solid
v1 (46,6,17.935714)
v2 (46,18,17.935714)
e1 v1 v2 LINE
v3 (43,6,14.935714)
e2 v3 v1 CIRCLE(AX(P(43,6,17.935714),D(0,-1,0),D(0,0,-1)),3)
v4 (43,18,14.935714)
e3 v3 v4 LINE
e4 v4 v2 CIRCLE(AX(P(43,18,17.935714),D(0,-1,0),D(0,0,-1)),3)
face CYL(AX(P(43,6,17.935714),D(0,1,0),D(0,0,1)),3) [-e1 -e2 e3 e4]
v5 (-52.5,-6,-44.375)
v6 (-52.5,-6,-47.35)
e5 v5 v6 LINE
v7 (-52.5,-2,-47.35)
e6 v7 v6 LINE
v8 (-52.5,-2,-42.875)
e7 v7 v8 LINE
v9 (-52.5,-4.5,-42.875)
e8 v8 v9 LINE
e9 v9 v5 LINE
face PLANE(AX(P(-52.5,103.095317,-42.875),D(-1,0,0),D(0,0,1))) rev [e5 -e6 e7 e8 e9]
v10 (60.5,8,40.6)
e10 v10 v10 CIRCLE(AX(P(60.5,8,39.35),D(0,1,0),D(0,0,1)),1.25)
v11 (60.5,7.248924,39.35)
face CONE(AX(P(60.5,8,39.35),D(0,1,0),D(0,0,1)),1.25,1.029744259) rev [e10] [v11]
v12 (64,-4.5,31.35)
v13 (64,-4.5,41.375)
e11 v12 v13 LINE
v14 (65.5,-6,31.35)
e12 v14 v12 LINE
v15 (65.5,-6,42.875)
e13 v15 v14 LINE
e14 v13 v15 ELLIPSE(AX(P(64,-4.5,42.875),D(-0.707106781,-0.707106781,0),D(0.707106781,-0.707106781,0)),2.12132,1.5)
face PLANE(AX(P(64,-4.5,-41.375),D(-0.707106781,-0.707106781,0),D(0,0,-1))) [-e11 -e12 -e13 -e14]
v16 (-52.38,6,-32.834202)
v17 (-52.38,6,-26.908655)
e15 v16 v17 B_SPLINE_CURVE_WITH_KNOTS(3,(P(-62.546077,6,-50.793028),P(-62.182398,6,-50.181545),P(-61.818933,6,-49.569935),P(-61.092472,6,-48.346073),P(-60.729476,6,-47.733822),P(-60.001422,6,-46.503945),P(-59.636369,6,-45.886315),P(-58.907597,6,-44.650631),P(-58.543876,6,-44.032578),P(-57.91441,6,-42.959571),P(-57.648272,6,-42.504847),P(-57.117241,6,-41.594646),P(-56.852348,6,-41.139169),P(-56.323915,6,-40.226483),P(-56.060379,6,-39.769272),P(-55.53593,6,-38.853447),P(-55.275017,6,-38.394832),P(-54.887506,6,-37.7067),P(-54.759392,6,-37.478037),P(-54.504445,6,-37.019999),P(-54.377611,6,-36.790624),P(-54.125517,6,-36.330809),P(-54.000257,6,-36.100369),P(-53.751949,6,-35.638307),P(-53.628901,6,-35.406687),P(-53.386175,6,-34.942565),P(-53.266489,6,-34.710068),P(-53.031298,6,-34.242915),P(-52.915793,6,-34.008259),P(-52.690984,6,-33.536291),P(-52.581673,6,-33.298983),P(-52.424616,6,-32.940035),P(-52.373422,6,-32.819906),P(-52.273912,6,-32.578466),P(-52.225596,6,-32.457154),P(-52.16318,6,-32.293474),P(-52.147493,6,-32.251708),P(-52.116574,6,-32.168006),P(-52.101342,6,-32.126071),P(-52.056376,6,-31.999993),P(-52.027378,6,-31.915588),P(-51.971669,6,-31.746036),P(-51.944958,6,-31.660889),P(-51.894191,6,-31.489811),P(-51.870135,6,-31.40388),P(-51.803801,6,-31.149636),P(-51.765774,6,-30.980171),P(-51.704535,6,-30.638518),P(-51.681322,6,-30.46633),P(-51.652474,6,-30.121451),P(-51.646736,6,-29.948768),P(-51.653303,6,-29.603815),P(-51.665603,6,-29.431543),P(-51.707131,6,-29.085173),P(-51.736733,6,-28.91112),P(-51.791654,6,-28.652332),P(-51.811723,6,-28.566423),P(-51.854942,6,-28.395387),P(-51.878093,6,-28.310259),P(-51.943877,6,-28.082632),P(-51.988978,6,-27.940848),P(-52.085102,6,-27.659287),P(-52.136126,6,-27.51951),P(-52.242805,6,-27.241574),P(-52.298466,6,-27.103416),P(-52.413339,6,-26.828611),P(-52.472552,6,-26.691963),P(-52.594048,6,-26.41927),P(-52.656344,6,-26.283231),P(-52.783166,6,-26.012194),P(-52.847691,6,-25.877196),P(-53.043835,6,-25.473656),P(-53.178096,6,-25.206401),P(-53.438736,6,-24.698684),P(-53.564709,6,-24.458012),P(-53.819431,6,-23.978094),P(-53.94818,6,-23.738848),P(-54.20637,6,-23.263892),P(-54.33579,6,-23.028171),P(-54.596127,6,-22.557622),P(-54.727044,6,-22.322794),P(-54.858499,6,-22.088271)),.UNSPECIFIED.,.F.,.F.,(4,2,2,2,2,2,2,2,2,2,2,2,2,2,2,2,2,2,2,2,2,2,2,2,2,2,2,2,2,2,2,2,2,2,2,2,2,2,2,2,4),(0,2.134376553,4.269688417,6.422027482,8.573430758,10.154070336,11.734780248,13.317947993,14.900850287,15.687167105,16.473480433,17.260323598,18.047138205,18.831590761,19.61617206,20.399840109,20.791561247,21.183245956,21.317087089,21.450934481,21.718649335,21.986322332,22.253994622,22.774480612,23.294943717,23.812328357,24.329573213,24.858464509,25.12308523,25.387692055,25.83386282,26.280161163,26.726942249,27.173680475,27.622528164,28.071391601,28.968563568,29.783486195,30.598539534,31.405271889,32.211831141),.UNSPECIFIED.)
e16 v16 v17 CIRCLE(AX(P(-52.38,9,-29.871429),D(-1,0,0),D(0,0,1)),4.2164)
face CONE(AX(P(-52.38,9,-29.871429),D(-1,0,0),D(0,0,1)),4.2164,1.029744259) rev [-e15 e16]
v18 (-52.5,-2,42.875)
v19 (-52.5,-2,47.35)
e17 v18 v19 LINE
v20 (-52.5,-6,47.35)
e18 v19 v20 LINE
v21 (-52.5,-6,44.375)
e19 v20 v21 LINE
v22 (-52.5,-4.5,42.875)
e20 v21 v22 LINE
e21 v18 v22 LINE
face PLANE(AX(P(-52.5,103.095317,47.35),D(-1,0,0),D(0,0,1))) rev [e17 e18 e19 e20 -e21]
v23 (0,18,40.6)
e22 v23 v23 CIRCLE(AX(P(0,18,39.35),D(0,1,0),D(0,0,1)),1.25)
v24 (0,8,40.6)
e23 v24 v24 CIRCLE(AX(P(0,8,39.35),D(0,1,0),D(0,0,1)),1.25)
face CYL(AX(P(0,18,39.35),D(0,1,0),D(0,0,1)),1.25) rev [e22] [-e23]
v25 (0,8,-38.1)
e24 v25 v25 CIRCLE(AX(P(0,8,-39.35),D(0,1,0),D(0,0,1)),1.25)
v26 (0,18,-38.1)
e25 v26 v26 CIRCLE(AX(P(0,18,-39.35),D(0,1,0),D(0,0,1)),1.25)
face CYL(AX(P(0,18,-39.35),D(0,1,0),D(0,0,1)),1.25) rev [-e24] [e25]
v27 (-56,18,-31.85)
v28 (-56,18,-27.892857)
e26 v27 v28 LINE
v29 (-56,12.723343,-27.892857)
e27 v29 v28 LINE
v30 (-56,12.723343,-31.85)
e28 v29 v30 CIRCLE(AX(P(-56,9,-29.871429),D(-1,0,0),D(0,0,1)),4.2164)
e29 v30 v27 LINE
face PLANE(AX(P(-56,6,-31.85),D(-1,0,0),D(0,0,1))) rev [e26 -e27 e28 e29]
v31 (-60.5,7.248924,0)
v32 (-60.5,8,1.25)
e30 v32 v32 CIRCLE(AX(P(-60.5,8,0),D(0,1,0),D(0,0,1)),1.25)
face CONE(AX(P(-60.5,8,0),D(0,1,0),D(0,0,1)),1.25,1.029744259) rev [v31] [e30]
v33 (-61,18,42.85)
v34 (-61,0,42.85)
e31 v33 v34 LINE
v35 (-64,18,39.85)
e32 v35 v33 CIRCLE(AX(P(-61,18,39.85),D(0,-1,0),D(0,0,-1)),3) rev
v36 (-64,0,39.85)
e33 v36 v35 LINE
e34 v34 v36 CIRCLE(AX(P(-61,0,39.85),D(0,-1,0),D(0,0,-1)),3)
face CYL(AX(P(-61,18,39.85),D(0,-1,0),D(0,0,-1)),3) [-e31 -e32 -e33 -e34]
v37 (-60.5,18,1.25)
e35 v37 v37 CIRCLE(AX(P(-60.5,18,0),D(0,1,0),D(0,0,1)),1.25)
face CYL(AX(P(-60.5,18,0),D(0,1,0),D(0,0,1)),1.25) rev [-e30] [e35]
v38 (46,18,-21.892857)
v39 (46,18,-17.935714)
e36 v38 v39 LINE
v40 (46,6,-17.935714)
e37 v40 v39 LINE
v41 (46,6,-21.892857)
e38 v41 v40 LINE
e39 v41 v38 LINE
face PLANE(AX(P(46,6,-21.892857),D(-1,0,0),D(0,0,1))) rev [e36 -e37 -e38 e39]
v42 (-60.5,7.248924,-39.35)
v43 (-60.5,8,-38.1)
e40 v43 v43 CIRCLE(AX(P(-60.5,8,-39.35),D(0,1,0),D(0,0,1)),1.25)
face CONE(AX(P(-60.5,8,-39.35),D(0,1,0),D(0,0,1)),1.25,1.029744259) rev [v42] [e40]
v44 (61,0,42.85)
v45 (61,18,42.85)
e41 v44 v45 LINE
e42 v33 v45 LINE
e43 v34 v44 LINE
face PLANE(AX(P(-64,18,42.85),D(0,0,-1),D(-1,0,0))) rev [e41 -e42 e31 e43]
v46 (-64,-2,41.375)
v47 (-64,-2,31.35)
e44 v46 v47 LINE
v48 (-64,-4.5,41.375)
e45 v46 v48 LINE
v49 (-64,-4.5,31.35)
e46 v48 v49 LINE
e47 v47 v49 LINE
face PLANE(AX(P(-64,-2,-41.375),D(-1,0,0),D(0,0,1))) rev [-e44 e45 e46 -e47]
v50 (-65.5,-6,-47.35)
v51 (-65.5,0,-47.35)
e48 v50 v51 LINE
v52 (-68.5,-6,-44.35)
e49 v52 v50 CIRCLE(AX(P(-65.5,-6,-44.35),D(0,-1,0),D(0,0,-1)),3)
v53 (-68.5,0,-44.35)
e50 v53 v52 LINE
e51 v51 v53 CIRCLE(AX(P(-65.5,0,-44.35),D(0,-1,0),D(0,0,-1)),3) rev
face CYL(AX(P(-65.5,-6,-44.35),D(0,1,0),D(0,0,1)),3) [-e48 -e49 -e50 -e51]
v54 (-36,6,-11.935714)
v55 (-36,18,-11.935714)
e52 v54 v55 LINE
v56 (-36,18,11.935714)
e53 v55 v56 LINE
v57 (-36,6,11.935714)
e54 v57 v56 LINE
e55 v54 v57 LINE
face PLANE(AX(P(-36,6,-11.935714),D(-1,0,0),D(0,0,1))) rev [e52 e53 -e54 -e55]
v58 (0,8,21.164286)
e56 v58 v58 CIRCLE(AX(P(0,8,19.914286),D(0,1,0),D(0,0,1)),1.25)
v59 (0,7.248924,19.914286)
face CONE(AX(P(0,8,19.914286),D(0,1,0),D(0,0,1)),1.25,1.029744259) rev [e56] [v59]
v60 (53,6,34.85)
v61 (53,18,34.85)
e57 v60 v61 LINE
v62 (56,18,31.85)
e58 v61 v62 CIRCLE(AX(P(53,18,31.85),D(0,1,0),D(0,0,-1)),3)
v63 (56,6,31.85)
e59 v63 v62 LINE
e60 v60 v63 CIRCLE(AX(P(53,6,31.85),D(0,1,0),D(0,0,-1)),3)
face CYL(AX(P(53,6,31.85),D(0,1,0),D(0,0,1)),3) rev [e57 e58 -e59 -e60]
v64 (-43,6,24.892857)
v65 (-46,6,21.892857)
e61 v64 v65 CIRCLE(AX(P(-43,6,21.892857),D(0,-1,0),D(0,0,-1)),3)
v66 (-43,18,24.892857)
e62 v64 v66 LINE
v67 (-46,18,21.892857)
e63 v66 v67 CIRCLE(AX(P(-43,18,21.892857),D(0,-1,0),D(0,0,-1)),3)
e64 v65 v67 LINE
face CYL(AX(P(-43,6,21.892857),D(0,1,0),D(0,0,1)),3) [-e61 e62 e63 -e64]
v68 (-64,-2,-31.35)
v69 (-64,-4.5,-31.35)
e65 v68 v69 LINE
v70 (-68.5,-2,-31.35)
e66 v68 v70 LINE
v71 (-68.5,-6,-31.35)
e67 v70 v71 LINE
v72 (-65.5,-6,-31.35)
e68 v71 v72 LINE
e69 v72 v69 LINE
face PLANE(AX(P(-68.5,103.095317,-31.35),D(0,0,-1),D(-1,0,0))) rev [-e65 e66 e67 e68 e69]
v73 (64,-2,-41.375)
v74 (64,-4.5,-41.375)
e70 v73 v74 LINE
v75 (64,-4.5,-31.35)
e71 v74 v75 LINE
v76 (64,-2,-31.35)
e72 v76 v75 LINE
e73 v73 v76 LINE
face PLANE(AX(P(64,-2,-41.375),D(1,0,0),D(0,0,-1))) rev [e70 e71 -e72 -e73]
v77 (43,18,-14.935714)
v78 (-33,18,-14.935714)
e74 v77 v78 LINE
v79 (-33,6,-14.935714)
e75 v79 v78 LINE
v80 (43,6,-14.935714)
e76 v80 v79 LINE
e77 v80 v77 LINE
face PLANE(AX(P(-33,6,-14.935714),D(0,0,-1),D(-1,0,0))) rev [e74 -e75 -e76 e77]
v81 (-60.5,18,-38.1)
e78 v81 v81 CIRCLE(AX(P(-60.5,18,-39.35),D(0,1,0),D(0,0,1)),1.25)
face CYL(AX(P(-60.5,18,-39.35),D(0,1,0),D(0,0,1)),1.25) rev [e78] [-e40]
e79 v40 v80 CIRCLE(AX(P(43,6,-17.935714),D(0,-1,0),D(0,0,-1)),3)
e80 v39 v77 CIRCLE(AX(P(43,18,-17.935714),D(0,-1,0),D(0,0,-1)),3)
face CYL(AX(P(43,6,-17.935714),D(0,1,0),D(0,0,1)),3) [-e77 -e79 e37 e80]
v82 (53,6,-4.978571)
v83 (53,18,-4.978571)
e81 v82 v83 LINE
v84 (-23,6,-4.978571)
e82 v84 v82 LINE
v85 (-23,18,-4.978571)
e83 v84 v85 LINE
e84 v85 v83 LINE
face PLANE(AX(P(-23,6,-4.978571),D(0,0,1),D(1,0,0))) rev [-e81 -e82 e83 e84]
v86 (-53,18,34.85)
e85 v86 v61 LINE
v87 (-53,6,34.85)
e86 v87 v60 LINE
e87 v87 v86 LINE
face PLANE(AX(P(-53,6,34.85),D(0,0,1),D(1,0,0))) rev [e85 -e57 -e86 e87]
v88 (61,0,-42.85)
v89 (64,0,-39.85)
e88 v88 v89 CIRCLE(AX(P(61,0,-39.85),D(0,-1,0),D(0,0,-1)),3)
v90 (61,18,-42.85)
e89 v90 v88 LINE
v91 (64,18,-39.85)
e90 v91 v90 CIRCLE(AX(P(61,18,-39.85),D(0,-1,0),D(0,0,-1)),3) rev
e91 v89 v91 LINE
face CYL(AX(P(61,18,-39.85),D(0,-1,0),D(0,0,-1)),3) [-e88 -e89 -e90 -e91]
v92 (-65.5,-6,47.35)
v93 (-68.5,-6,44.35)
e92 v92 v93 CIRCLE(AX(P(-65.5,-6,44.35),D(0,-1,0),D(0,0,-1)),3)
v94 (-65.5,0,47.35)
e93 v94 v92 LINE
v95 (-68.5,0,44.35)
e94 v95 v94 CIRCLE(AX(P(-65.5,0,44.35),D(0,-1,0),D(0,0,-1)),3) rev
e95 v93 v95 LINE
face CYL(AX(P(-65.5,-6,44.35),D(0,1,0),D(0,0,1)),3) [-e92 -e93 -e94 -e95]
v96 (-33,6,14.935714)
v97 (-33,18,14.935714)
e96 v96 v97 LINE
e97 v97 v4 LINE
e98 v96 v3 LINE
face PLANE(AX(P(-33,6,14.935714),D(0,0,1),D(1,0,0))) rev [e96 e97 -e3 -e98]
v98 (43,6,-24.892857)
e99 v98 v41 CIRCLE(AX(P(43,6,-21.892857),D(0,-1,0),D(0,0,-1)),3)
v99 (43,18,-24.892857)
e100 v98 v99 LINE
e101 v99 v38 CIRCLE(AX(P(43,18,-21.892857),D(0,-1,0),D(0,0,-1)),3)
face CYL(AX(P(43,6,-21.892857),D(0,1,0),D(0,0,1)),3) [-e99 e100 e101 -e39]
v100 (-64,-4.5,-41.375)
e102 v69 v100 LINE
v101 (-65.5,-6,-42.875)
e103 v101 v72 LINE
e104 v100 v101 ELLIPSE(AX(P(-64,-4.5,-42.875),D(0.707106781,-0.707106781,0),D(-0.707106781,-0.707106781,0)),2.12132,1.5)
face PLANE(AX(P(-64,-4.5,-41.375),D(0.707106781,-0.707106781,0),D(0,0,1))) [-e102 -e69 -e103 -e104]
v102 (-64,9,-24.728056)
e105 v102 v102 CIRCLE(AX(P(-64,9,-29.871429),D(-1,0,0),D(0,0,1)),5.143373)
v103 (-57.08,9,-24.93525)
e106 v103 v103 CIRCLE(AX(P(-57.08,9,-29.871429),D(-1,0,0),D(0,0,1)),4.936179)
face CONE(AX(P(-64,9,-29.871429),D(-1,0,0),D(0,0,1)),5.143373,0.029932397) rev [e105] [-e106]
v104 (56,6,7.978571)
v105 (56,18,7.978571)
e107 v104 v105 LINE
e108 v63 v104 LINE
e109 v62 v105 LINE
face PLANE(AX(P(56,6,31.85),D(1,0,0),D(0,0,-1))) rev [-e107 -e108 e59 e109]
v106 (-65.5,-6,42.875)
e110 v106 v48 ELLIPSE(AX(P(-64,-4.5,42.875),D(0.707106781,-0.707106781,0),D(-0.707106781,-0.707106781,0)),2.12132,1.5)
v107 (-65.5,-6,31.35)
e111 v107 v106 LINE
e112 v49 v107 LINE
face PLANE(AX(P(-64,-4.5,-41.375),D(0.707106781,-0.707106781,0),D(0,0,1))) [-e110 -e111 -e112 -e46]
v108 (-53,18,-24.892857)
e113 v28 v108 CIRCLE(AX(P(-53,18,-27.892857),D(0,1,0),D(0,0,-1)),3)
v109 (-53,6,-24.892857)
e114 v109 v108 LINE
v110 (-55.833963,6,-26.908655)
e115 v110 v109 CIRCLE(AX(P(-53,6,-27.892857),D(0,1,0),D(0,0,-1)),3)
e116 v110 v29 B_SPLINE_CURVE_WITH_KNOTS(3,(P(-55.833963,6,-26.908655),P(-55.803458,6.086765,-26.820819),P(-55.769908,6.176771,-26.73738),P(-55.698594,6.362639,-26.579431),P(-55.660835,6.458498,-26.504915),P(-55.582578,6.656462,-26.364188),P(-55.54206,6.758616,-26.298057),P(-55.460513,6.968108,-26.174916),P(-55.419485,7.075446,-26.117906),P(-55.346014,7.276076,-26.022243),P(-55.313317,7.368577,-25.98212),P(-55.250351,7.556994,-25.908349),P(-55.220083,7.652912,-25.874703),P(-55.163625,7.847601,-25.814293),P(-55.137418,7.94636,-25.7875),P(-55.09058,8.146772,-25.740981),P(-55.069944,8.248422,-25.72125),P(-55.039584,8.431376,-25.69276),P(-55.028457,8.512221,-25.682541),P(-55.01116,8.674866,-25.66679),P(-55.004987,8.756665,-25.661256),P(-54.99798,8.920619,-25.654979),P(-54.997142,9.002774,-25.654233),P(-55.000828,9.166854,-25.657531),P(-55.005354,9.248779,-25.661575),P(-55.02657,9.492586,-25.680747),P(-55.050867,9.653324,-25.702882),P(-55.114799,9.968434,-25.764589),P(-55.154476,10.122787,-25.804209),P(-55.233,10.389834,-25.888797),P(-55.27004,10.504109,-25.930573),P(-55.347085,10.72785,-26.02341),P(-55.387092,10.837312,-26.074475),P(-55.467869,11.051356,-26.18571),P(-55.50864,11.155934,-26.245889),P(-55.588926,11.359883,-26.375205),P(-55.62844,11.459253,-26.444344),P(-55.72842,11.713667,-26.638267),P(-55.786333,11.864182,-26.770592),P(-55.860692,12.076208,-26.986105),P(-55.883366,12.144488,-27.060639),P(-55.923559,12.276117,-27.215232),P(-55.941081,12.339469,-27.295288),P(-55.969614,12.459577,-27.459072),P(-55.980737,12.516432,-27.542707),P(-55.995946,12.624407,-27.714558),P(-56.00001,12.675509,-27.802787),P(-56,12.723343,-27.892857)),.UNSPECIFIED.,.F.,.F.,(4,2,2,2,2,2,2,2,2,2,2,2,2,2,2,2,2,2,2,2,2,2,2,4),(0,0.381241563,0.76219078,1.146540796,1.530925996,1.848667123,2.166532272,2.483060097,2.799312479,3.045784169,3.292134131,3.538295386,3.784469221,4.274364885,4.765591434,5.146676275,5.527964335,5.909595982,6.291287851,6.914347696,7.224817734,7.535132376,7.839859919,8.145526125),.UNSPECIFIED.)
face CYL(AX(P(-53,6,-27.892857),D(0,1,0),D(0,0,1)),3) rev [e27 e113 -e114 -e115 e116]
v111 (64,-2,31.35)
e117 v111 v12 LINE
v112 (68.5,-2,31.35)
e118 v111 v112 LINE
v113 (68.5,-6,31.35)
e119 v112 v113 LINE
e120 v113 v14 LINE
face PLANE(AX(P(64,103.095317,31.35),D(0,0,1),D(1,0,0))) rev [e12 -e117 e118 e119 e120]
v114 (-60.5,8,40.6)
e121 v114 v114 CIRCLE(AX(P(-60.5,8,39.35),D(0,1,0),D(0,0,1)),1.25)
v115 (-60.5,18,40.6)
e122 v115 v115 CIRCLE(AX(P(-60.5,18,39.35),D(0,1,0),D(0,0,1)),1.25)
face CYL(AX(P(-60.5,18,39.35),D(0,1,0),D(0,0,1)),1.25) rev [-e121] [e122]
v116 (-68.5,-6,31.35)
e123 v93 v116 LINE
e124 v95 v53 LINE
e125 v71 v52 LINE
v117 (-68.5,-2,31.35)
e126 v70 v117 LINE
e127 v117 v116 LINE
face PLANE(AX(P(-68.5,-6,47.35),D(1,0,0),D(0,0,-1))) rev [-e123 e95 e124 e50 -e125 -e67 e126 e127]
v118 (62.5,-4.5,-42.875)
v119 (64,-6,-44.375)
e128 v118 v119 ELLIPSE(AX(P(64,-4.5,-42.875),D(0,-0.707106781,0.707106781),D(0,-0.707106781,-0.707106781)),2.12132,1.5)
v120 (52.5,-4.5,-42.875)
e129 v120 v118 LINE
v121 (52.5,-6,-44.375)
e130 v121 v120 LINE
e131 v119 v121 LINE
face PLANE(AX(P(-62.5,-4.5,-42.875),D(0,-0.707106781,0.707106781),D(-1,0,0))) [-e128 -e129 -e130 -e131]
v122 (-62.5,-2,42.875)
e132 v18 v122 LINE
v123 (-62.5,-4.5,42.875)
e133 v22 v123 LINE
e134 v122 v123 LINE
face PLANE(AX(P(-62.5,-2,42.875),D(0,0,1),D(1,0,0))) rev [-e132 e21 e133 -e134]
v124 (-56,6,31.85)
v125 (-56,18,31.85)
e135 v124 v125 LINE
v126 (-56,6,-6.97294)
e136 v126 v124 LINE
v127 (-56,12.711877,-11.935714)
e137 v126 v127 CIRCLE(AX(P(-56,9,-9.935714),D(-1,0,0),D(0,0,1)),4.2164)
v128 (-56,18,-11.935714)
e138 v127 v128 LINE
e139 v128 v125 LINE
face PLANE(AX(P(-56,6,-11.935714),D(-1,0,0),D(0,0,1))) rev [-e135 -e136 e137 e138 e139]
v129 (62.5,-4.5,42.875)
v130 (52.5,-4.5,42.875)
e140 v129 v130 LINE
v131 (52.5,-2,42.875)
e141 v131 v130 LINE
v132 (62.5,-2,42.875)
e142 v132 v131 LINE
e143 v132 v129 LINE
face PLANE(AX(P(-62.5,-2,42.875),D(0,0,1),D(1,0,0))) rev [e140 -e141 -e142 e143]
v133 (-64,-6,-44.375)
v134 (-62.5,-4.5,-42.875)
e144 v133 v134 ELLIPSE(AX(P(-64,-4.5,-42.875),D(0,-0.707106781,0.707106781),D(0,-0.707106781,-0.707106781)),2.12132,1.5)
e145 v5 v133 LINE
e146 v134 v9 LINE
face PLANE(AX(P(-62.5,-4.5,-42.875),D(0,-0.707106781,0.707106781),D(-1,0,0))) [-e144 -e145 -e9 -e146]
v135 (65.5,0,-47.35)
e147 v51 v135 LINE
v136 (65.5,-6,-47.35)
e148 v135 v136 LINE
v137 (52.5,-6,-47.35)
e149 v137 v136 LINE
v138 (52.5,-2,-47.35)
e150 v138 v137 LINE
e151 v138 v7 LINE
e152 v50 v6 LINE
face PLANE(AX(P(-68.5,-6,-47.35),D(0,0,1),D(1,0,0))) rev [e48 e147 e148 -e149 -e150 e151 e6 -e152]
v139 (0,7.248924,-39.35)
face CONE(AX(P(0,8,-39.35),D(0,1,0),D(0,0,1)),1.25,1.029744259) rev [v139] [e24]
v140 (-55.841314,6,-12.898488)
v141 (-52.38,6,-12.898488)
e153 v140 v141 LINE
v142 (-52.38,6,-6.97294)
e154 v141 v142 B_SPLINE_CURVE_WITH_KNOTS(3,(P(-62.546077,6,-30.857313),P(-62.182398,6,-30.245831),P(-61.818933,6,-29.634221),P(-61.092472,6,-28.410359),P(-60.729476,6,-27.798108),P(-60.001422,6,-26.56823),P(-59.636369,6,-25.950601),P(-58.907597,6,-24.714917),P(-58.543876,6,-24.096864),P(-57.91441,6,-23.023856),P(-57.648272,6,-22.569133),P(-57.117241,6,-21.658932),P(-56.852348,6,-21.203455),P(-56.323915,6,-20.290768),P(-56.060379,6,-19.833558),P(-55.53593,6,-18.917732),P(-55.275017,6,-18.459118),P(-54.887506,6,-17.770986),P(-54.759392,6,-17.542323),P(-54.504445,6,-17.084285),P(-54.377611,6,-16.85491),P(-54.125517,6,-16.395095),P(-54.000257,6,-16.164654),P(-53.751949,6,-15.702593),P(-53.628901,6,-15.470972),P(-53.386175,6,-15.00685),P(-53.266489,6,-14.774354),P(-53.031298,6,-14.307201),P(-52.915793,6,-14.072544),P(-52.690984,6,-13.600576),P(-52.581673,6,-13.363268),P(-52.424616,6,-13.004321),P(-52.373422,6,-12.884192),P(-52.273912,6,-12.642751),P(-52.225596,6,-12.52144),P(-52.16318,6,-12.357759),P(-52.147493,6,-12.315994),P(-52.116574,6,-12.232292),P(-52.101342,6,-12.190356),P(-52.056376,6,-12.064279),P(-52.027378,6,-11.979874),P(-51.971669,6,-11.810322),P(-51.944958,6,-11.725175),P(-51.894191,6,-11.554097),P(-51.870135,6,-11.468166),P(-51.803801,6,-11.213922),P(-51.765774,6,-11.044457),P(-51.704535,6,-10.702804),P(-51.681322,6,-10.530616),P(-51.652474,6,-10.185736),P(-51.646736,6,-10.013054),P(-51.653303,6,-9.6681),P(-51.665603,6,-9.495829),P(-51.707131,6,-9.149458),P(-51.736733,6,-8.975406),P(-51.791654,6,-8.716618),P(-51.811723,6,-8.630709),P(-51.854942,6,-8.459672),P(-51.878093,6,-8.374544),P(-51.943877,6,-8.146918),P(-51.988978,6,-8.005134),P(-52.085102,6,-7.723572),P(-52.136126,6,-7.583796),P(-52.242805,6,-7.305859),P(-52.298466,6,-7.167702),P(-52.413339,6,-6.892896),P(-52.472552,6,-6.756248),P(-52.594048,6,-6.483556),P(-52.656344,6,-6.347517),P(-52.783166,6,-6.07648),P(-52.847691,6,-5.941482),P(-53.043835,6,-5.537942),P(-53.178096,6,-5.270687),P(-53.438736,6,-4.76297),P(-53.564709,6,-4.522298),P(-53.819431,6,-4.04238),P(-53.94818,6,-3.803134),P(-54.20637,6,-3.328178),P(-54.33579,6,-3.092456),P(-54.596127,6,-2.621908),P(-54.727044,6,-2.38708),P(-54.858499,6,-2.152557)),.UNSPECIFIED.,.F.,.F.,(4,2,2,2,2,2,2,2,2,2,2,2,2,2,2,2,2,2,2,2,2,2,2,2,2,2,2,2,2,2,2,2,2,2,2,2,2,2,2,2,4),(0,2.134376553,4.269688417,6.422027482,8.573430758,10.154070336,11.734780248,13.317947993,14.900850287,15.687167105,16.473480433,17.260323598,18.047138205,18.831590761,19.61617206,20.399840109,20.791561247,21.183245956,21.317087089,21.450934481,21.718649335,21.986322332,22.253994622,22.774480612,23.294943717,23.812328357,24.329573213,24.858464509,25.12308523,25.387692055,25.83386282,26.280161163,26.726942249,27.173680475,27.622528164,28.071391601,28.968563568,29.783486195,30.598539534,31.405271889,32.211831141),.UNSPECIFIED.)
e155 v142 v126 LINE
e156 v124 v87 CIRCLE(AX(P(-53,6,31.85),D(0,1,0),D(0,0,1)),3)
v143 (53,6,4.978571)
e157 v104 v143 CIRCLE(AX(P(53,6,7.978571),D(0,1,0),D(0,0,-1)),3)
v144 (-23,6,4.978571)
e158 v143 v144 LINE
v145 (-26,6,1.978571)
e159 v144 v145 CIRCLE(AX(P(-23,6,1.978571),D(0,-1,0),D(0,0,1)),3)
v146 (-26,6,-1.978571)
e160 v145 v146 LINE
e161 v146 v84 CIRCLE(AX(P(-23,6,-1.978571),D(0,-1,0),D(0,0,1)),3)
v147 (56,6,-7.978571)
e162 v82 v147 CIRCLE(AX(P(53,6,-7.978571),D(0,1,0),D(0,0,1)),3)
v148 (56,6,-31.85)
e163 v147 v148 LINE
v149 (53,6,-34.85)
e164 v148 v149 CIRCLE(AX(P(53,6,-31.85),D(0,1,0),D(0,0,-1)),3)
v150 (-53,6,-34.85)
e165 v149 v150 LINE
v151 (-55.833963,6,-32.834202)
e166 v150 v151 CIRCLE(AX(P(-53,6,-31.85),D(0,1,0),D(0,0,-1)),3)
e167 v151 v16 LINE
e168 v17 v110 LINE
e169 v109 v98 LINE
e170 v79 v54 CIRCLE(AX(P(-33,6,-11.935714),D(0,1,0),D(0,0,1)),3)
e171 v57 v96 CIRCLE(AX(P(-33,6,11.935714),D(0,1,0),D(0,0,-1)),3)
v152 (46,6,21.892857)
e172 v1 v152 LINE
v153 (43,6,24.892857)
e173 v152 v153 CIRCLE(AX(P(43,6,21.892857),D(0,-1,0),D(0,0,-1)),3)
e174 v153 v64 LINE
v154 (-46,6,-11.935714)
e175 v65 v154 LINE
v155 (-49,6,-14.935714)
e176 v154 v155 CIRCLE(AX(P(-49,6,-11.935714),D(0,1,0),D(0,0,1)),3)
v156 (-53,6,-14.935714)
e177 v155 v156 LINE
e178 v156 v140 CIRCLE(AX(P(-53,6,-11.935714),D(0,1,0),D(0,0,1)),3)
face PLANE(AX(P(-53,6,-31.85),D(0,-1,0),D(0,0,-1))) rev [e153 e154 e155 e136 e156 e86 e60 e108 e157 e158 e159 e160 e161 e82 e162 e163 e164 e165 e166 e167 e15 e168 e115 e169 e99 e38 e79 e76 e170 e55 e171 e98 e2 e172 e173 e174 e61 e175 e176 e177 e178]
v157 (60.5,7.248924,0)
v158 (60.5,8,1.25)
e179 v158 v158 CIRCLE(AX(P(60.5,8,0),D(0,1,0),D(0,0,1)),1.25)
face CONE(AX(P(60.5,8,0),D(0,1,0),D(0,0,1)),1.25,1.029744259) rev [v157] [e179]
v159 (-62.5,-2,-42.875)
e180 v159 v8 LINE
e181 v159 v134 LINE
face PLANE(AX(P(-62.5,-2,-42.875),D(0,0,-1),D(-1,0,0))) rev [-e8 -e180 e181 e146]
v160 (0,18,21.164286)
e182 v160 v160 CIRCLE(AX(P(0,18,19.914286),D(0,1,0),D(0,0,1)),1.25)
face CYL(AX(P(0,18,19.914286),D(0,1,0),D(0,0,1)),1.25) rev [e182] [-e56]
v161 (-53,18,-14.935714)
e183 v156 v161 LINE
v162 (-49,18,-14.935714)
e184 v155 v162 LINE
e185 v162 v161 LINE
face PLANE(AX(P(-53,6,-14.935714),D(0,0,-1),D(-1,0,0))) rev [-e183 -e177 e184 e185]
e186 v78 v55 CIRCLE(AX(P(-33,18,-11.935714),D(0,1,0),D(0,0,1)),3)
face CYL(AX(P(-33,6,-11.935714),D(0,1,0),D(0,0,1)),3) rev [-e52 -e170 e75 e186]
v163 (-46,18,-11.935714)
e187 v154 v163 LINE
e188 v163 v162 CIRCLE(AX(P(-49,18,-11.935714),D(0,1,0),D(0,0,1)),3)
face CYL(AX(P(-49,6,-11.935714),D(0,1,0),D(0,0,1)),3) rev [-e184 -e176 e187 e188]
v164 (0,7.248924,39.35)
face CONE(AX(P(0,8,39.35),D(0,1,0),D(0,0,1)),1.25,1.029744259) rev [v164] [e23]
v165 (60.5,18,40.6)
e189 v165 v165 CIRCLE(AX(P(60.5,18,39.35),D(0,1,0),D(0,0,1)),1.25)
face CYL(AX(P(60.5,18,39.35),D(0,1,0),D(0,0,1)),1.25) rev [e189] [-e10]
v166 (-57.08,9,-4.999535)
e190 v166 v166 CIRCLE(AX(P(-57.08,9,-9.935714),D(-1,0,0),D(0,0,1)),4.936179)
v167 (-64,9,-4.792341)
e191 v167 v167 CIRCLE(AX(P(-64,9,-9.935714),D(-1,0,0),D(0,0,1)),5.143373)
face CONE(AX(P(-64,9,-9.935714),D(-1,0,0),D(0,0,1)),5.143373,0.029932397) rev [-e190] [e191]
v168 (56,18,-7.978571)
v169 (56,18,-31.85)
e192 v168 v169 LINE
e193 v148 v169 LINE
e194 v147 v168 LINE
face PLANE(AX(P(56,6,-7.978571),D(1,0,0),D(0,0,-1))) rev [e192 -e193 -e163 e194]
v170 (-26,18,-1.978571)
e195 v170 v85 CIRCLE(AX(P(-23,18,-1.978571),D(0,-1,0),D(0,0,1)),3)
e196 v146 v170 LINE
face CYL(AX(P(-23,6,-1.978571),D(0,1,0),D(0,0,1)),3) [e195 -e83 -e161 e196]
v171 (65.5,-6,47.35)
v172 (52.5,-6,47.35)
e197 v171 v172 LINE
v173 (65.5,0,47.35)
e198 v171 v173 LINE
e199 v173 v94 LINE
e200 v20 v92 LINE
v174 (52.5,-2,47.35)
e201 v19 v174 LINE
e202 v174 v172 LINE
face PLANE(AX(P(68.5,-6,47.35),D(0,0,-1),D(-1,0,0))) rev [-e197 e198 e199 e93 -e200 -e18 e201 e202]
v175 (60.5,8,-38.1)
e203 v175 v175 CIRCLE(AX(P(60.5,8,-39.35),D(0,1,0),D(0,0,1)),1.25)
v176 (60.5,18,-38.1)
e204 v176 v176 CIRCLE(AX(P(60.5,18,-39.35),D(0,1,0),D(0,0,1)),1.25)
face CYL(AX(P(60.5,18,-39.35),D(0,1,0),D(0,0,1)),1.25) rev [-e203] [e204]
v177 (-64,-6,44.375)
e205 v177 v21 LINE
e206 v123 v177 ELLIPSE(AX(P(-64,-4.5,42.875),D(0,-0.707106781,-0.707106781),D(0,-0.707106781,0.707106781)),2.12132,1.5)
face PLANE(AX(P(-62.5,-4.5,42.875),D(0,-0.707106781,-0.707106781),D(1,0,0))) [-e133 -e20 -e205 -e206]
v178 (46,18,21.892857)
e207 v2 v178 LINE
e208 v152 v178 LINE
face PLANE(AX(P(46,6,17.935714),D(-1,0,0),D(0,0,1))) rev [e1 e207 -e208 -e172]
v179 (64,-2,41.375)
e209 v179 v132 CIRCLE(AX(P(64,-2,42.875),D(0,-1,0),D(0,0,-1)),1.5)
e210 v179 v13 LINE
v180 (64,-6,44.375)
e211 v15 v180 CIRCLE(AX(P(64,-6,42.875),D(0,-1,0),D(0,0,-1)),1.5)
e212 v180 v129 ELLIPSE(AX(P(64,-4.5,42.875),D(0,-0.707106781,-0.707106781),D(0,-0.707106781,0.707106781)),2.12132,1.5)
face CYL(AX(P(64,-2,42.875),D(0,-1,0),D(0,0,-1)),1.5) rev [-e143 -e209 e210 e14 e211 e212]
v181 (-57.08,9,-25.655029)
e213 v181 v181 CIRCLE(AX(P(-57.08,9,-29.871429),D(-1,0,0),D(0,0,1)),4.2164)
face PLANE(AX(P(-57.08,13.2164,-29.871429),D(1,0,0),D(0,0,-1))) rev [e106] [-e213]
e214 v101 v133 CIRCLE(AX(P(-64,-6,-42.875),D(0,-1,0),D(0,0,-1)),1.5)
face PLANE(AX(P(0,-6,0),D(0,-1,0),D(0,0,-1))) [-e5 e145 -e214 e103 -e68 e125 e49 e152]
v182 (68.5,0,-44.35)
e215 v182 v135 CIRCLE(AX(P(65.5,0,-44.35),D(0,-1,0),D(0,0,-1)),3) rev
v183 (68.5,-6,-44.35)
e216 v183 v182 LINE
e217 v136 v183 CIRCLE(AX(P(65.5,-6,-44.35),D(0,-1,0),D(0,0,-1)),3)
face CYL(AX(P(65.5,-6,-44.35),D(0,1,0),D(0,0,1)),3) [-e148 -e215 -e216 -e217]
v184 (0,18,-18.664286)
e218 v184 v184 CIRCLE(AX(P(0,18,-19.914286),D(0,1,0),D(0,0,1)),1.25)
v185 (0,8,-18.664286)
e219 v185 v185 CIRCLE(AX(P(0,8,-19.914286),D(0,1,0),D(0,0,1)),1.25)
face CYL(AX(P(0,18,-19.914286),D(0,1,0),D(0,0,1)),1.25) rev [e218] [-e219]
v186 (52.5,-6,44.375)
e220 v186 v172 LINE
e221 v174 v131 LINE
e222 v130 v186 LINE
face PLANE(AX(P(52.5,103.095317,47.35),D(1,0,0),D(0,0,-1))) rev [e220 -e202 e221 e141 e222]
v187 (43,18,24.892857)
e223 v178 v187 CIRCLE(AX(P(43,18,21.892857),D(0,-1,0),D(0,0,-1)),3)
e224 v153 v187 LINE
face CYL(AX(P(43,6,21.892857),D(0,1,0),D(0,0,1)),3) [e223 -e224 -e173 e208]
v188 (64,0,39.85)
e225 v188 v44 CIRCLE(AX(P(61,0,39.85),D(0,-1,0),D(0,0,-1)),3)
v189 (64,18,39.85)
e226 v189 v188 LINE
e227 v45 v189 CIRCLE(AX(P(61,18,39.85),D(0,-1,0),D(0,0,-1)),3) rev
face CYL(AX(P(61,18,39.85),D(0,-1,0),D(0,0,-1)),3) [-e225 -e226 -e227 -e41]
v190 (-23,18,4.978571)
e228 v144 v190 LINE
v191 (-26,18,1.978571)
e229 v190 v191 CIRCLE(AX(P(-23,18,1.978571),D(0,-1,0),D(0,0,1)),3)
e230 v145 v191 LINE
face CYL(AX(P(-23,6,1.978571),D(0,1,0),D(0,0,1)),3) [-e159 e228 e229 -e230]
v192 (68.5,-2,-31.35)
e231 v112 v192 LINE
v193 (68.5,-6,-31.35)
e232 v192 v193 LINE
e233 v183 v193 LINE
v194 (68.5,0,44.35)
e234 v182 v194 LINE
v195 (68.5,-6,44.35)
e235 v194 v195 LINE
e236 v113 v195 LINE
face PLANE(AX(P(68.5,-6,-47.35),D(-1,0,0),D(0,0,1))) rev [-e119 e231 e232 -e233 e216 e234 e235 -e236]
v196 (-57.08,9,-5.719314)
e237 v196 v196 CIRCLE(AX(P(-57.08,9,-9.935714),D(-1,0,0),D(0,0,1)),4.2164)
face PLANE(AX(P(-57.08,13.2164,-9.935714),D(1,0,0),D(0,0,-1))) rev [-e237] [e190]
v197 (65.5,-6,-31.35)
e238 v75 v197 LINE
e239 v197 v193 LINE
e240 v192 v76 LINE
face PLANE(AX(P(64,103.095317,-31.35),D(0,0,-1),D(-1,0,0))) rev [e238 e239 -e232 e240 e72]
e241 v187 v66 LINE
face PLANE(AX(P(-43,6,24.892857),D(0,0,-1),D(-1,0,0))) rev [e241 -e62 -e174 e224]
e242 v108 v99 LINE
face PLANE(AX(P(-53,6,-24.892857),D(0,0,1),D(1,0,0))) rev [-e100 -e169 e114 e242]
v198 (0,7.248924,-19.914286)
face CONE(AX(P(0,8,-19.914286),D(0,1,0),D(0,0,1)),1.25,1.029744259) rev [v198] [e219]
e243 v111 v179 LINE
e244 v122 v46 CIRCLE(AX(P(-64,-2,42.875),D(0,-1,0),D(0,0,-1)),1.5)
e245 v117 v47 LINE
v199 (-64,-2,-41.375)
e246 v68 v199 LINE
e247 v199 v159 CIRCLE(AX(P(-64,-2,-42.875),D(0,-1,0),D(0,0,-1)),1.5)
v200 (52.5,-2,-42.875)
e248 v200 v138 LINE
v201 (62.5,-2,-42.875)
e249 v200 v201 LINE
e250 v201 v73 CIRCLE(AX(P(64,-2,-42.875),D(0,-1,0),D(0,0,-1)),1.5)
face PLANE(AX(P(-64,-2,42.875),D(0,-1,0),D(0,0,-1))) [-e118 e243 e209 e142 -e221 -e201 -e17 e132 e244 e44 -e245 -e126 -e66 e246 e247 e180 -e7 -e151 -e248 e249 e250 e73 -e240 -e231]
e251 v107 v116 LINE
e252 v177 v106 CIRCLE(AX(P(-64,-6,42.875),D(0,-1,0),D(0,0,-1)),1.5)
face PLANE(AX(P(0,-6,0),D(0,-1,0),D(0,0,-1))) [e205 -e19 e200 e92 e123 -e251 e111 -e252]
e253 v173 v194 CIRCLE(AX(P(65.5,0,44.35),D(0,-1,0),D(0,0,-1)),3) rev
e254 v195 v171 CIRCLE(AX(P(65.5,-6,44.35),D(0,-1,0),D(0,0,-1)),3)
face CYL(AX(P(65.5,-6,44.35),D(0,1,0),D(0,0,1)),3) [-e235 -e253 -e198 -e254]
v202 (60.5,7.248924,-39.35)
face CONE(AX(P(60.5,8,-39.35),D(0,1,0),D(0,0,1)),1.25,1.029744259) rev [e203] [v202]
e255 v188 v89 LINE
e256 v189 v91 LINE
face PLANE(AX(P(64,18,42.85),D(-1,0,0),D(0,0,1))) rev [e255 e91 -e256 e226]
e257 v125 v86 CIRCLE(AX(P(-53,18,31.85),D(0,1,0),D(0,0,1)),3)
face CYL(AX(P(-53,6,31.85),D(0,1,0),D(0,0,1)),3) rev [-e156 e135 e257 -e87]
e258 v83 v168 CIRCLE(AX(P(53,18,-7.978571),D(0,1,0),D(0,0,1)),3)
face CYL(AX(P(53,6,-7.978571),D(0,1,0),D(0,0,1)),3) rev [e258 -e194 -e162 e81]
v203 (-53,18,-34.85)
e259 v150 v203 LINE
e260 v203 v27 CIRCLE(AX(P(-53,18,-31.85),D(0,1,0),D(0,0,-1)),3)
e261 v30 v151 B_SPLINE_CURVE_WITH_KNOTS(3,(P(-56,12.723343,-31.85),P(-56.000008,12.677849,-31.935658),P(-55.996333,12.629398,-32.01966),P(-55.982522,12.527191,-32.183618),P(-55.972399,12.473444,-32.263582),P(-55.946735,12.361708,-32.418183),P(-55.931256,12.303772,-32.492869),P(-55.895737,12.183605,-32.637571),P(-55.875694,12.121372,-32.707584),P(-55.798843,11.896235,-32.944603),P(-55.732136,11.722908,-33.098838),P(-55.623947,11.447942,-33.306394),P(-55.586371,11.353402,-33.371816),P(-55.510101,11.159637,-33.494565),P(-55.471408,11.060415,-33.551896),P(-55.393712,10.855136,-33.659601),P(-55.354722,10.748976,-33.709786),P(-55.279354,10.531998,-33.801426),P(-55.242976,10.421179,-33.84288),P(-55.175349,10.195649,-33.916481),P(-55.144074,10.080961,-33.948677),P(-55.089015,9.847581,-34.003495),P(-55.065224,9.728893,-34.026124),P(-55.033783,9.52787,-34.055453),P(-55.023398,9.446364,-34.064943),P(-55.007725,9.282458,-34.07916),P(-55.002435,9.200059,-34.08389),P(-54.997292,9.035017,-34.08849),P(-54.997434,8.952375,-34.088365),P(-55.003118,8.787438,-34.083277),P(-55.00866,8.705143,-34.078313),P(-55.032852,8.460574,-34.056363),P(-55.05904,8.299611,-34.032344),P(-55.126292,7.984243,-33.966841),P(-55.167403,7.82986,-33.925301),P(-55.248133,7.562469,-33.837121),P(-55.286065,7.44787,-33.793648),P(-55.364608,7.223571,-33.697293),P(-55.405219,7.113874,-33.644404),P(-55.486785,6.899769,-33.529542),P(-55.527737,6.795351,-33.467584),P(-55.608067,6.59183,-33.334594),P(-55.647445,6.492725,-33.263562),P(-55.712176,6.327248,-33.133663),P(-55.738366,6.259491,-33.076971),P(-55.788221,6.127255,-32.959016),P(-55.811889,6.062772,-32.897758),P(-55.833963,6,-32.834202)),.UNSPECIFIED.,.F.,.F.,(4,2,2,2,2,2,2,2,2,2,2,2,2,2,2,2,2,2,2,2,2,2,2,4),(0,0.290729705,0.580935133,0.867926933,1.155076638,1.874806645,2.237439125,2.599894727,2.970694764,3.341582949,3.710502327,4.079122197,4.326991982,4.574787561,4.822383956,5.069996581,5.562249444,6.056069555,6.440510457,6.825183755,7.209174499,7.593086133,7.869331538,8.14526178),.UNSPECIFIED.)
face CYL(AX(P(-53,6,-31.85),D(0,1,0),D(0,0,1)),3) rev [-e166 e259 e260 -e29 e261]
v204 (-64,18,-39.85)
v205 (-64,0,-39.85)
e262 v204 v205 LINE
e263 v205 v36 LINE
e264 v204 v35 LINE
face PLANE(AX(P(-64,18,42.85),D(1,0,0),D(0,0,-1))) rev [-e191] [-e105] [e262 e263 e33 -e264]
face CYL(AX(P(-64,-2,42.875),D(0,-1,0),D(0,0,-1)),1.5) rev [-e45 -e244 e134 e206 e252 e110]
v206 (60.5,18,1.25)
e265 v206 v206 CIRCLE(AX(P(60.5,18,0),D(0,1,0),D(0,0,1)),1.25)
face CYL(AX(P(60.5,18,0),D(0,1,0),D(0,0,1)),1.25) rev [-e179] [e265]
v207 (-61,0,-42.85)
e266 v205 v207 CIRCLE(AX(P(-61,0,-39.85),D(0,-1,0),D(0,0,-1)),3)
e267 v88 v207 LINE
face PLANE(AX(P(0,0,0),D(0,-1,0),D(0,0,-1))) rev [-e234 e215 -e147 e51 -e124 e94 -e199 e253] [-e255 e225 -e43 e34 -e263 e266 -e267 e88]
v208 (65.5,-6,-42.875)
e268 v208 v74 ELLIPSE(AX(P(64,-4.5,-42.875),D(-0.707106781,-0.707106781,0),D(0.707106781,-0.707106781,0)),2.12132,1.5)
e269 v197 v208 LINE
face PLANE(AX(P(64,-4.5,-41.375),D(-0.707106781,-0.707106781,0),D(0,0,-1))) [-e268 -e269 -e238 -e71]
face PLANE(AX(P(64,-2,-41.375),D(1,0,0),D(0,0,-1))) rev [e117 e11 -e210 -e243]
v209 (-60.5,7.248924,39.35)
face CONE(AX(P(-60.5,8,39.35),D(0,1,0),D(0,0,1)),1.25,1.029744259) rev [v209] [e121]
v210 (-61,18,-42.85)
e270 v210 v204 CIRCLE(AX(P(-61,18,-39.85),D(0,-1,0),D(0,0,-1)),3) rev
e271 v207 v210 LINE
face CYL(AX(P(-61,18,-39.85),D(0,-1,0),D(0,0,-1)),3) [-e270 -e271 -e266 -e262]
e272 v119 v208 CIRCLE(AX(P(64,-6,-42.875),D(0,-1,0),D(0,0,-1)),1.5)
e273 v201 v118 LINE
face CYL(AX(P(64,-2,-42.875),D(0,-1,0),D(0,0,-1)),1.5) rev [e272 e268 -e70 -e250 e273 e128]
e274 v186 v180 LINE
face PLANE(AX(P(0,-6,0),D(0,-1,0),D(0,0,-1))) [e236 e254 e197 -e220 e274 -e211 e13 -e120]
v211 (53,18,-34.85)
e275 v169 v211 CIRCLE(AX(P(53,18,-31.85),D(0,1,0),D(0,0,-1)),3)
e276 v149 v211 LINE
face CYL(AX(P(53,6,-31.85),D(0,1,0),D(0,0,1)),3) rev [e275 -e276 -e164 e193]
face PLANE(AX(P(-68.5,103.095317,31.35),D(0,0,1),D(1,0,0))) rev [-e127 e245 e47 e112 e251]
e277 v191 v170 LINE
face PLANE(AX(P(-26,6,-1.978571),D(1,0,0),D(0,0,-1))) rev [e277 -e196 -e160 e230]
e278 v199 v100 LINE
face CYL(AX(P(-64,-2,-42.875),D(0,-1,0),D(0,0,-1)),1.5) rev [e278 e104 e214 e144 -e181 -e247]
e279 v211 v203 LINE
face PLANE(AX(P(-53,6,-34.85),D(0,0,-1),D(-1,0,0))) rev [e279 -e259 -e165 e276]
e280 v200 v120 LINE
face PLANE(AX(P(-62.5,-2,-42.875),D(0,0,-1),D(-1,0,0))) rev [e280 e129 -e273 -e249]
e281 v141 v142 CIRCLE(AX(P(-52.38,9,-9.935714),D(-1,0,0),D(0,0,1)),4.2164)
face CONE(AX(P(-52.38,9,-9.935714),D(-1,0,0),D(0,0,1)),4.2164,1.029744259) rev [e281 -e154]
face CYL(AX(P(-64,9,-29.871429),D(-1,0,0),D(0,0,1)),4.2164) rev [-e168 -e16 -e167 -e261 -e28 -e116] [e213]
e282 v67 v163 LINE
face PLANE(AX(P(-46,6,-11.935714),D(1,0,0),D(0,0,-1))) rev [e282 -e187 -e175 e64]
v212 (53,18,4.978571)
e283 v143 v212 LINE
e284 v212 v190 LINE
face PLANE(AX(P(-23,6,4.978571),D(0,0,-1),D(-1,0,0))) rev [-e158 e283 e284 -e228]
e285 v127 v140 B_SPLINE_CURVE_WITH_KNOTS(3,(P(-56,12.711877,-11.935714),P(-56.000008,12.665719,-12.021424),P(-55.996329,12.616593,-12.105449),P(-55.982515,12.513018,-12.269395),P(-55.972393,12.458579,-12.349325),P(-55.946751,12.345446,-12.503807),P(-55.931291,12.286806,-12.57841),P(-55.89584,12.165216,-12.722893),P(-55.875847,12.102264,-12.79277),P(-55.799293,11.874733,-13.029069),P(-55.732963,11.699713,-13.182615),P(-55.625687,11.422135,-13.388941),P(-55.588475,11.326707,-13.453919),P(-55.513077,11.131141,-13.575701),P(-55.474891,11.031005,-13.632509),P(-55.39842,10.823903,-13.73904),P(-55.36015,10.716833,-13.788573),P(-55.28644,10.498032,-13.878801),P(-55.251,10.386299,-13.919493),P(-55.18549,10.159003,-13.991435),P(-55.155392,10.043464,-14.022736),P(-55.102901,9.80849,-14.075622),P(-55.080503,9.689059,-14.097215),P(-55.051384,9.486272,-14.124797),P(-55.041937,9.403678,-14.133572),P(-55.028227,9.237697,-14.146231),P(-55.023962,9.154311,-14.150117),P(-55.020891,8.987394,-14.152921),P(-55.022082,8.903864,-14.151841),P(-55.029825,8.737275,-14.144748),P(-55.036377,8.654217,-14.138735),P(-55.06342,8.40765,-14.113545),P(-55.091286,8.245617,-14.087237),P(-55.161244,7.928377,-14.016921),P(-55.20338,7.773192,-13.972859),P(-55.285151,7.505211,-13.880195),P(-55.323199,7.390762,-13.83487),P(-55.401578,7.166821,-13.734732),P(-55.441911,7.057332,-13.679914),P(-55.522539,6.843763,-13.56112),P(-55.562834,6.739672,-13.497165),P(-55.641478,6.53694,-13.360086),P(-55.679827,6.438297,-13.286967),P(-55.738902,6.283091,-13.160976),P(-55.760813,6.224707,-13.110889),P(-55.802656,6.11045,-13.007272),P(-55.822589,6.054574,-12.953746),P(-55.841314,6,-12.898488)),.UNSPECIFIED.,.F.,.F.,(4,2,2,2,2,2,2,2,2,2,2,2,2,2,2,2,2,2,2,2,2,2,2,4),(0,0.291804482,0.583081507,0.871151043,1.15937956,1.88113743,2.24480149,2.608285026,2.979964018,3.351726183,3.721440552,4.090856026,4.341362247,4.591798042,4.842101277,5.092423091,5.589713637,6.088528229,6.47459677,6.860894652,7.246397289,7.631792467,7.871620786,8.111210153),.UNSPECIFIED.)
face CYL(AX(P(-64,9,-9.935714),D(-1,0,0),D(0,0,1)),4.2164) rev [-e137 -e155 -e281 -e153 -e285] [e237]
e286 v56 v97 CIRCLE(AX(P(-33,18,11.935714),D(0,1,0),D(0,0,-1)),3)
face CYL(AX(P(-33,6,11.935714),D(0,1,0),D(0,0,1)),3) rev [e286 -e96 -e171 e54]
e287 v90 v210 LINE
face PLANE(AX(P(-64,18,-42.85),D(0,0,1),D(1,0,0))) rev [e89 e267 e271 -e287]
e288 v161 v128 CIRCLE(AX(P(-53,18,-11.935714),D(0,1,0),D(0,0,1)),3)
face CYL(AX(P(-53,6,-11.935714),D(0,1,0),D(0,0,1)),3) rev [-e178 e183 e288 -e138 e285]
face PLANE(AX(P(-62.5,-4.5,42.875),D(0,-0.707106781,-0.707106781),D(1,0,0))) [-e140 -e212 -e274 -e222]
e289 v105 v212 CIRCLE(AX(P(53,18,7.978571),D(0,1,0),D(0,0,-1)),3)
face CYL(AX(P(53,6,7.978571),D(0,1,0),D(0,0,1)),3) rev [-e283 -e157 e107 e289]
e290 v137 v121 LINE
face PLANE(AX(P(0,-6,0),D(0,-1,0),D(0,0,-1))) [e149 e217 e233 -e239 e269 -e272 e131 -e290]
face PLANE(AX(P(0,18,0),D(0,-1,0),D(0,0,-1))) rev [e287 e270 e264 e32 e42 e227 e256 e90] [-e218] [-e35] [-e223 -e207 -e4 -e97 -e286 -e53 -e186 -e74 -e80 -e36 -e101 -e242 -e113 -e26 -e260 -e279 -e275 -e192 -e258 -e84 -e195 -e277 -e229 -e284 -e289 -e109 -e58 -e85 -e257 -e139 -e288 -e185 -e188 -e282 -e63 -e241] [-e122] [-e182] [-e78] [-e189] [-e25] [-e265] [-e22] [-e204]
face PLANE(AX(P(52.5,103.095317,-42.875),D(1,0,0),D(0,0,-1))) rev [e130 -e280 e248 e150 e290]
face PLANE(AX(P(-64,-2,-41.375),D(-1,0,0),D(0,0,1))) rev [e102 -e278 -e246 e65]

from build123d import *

# Parameters (mm, degrees)
SKETCH1_W                         = 128
SKETCH1_H                         = 85.7
BOSS_EXTRUDE1_DEPTH               = 18
CUT_EXTRUDE1_DEPTH                = 12
M3X0_5_TAPPED_HOLE1_D             = 2.5
M3X0_5_TAPPED_HOLE1_DEPTH         = 10
M3X0_5_TAPPED_HOLE1_TIP           = 0.751075774
SKETCH10_W                        = 137
SKETCH10_H                        = 94.7
BOSS_EXTRUDE2_DEPTH               = 6
CUT_EXTRUDE2_DEPTH                = 4
SKETCH12_W                        = 4.5
SKETCH12_H                        = 62.7
SKETCH12_W_2                      = 105
SKETCH12_H_2                      = 4.475
CUT_EXTRUDE3_DEPTH                = 4
CHAMFER1_SIZE                     = 1.5
FILLET1_R                         = 3
F_1_8_NPT_TAPPED_HOLE1_AT_2_COUNT = 2
F_1_8_NPT_TAPPED_HOLE1_AT_2_PITCH = 19.935714286


with BuildPart() as part:
    # Sketch1 → Boss-Extrude1 (new body)
    with BuildSketch(Plane(origin=(0, 0, 0), x_dir=(1, 0, 0), z_dir=(0, 1, 0))):
        Rectangle(SKETCH1_W, SKETCH1_H)
    extrude(amount=BOSS_EXTRUDE1_DEPTH)

    # Sketch2 → Cut-Extrude1 (cut)
    with BuildSketch(Plane(origin=(0, 18, 0), x_dir=(1, 0, 0), z_dir=(0, 1, 0))):
        with BuildLine():
            Line((-46, 11.935714286), (-46, -21.892857143))
            ThreePointArc((-46, -21.892857143), (-45.121320344, -24.014177486), (-43, -24.892857143))
            Line((-43, -24.892857143), (43, -24.892857143))
            ThreePointArc((43, -24.892857143), (45.121320344, -24.014177486), (46, -21.892857143))
            Line((46, -21.892857143), (46, -17.935714286))
            ThreePointArc((46, -17.935714286), (45.121320344, -15.814393942), (43, -14.935714286))
            Line((43, -14.935714286), (-33, -14.935714286))
            ThreePointArc((-33, -14.935714286), (-35.121320344, -14.057034629), (-36, -11.935714286))
            Line((-36, -11.935714286), (-36, 11.935714286))
            ThreePointArc((-36, 11.935714286), (-35.121320344, 14.057034629), (-33, 14.935714286))
            Line((-33, 14.935714286), (43, 14.935714286))
            ThreePointArc((43, 14.935714286), (45.121320344, 15.814393942), (46, 17.935714286))
            Line((46, 17.935714286), (46, 21.892857143))
            ThreePointArc((46, 21.892857143), (45.121320344, 24.014177486), (43, 24.892857143))
            Line((43, 24.892857143), (-53, 24.892857143))
            ThreePointArc((-53, 24.892857143), (-55.121320344, 25.771536799), (-56, 27.892857143))
            Line((-56, 27.892857143), (-56, 31.85))
            ThreePointArc((-56, 31.85), (-55.121320344, 33.971320344), (-53, 34.85))
            Line((-53, 34.85), (53, 34.85))
            ThreePointArc((53, 34.85), (55.121320344, 33.971320344), (56, 31.85))
            Line((56, 31.85), (56, 7.978571429))
            ThreePointArc((56, 7.978571429), (55.121320344, 5.857251085), (53, 4.978571429))
            Line((53, 4.978571429), (-23, 4.978571429))
            ThreePointArc((-23, 4.978571429), (-25.121320344, 4.099891772), (-26, 1.978571429))
            Line((-26, 1.978571429), (-26, -1.978571429))
            ThreePointArc((-26, -1.978571429), (-25.121320344, -4.099891772), (-23, -4.978571429))
            Line((-23, -4.978571429), (53, -4.978571429))
            ThreePointArc((53, -4.978571429), (55.121320344, -5.857251085), (56, -7.978571429))
            Line((56, -7.978571429), (56, -31.85))
            ThreePointArc((56, -31.85), (55.121320344, -33.971320344), (53, -34.85))
            Line((53, -34.85), (-53, -34.85))
            ThreePointArc((-53, -34.85), (-55.121320344, -33.971320344), (-56, -31.85))
            Line((-56, -31.85), (-56, 11.935714286))
            ThreePointArc((-56, 11.935714286), (-55.121320344, 14.057034629), (-53, 14.935714286))
            Line((-53, 14.935714286), (-49, 14.935714286))
            ThreePointArc((-49, 14.935714286), (-46.878679656, 14.057034629), (-46, 11.935714286))
        make_face()
    extrude(amount=-CUT_EXTRUDE1_DEPTH, mode=Mode.SUBTRACT)

    # M3x0.5 Tapped Hole1
    with Locations(Plane(origin=(0, 18, 0), x_dir=(1, 0, 0), z_dir=(0, 1, 0))):
        with Locations((-60.5, 39.35), (0, 39.35), (60.5, 39.35), (60.5, 0), (60.5, -39.35), (0, -39.35), (-60.5, -39.35), (-60.5, 0), (0, 19.914285714), (0, -19.914285714)):
            Hole(M3X0_5_TAPPED_HOLE1_D / 2, depth=M3X0_5_TAPPED_HOLE1_DEPTH)
            with Locations((0, 0, -(M3X0_5_TAPPED_HOLE1_DEPTH + M3X0_5_TAPPED_HOLE1_TIP / 2))):  # 118° drill point
                Cone(0, M3X0_5_TAPPED_HOLE1_D / 2, M3X0_5_TAPPED_HOLE1_TIP, mode=Mode.SUBTRACT)

    # Sketch10 → Boss-Extrude2 (add)
    with BuildSketch(Plane.XZ):
        Rectangle(SKETCH10_W, SKETCH10_H)
    extrude(amount=BOSS_EXTRUDE2_DEPTH)

    # Sketch11 → Cut-Extrude2 (cut)
    with BuildSketch(Plane.XZ.offset(6)):
        with BuildLine():
            Line((-62.5, -42.875), (62.5, -42.875))
            ThreePointArc((62.5, -42.875), (65.060660172, -43.935660172), (64, -41.375))
            Line((64, -41.375), (64, 41.375))
            ThreePointArc((64, 41.375), (65.060660172, 43.935660172), (62.5, 42.875))
            Line((62.5, 42.875), (-62.5, 42.875))
            ThreePointArc((-62.5, 42.875), (-65.060660172, 43.935660172), (-64, 41.375))
            Line((-64, 41.375), (-64, -41.375))
            ThreePointArc((-64, -41.375), (-65.060660172, -43.935660172), (-62.5, -42.875))
        make_face()
    extrude(amount=-CUT_EXTRUDE2_DEPTH, mode=Mode.SUBTRACT)

    # Sketch12 → Cut-Extrude3 (cut)
    with BuildSketch(Plane.XZ.offset(6)):
        with Locations((-66.25, 0)):
            Rectangle(SKETCH12_W, SKETCH12_H)
        with Locations((66.25, 0)):
            Rectangle(SKETCH12_W, SKETCH12_H)
        with Locations((0, 45.1125)):
            Rectangle(SKETCH12_W_2, SKETCH12_H_2)
        with Locations((0, -45.1125)):
            Rectangle(SKETCH12_W_2, SKETCH12_H_2)
    extrude(amount=-CUT_EXTRUDE3_DEPTH, mode=Mode.SUBTRACT)

    # Chamfer1
    chamfer1_edges = [part.edges().sort_by_distance(p)[0] for p in [
        (-64, -6, 36.3625),
        (-57.5, -6, -42.875),
        (64, -6, -36.3625),
        (57.5, -6, 42.875),
        (-64, -6, -36.3625),
        (57.5, -6, -42.875),
        (64, -6, 36.3625),
        (-57.5, -6, 42.875),
    ]]
    chamfer(chamfer1_edges, length=CHAMFER1_SIZE - 0.0001)  # a hair under: the kernel refuses the full size

    # Fillet1
    fillet1_edges = [part.edges().sort_by_distance(p)[0] for p in [
        (-68.5, -3, -47.35),
        (68.5, -3, -47.35),
        (68.5, -3, 47.35),
        (-68.5, -3, 47.35),
        (64, 9, 42.85),
        (-64, 9, 42.85),
        (-64, 9, -42.85),
        (64, 9, -42.85),
    ]]
    fillet(fillet1_edges, radius=FILLET1_R)

    # Sketch14 → 1/8 NPT Tapped Hole1 (revolve, cut)
    with BuildSketch(Plane(origin=(-64, 9, -29.871428571), x_dir=(0, 0, 1), z_dir=(0, 1, 0))):
        Polygon((0, 0), (0, 14.153468714), (4.2164, 11.62), (4.2164, 6.92), (4.936178933, 6.92), (5.143373, 0), align=None)
    f_1_8_npt_tapped_hole1 = revolve(axis=Axis((-70.35, 9, -29.871428571), (1, 0, 0)), mode=Mode.SUBTRACT)

    # 1/8 NPT Tapped Hole1 at 2: 1/8 NPT Tapped Hole1 ×2
    with Locations(*[(0, 0, i * F_1_8_NPT_TAPPED_HOLE1_AT_2_PITCH) for i in range(1, F_1_8_NPT_TAPPED_HOLE1_AT_2_COUNT)]):
        add(f_1_8_npt_tapped_hole1, mode=Mode.SUBTRACT)


solid = part.part
